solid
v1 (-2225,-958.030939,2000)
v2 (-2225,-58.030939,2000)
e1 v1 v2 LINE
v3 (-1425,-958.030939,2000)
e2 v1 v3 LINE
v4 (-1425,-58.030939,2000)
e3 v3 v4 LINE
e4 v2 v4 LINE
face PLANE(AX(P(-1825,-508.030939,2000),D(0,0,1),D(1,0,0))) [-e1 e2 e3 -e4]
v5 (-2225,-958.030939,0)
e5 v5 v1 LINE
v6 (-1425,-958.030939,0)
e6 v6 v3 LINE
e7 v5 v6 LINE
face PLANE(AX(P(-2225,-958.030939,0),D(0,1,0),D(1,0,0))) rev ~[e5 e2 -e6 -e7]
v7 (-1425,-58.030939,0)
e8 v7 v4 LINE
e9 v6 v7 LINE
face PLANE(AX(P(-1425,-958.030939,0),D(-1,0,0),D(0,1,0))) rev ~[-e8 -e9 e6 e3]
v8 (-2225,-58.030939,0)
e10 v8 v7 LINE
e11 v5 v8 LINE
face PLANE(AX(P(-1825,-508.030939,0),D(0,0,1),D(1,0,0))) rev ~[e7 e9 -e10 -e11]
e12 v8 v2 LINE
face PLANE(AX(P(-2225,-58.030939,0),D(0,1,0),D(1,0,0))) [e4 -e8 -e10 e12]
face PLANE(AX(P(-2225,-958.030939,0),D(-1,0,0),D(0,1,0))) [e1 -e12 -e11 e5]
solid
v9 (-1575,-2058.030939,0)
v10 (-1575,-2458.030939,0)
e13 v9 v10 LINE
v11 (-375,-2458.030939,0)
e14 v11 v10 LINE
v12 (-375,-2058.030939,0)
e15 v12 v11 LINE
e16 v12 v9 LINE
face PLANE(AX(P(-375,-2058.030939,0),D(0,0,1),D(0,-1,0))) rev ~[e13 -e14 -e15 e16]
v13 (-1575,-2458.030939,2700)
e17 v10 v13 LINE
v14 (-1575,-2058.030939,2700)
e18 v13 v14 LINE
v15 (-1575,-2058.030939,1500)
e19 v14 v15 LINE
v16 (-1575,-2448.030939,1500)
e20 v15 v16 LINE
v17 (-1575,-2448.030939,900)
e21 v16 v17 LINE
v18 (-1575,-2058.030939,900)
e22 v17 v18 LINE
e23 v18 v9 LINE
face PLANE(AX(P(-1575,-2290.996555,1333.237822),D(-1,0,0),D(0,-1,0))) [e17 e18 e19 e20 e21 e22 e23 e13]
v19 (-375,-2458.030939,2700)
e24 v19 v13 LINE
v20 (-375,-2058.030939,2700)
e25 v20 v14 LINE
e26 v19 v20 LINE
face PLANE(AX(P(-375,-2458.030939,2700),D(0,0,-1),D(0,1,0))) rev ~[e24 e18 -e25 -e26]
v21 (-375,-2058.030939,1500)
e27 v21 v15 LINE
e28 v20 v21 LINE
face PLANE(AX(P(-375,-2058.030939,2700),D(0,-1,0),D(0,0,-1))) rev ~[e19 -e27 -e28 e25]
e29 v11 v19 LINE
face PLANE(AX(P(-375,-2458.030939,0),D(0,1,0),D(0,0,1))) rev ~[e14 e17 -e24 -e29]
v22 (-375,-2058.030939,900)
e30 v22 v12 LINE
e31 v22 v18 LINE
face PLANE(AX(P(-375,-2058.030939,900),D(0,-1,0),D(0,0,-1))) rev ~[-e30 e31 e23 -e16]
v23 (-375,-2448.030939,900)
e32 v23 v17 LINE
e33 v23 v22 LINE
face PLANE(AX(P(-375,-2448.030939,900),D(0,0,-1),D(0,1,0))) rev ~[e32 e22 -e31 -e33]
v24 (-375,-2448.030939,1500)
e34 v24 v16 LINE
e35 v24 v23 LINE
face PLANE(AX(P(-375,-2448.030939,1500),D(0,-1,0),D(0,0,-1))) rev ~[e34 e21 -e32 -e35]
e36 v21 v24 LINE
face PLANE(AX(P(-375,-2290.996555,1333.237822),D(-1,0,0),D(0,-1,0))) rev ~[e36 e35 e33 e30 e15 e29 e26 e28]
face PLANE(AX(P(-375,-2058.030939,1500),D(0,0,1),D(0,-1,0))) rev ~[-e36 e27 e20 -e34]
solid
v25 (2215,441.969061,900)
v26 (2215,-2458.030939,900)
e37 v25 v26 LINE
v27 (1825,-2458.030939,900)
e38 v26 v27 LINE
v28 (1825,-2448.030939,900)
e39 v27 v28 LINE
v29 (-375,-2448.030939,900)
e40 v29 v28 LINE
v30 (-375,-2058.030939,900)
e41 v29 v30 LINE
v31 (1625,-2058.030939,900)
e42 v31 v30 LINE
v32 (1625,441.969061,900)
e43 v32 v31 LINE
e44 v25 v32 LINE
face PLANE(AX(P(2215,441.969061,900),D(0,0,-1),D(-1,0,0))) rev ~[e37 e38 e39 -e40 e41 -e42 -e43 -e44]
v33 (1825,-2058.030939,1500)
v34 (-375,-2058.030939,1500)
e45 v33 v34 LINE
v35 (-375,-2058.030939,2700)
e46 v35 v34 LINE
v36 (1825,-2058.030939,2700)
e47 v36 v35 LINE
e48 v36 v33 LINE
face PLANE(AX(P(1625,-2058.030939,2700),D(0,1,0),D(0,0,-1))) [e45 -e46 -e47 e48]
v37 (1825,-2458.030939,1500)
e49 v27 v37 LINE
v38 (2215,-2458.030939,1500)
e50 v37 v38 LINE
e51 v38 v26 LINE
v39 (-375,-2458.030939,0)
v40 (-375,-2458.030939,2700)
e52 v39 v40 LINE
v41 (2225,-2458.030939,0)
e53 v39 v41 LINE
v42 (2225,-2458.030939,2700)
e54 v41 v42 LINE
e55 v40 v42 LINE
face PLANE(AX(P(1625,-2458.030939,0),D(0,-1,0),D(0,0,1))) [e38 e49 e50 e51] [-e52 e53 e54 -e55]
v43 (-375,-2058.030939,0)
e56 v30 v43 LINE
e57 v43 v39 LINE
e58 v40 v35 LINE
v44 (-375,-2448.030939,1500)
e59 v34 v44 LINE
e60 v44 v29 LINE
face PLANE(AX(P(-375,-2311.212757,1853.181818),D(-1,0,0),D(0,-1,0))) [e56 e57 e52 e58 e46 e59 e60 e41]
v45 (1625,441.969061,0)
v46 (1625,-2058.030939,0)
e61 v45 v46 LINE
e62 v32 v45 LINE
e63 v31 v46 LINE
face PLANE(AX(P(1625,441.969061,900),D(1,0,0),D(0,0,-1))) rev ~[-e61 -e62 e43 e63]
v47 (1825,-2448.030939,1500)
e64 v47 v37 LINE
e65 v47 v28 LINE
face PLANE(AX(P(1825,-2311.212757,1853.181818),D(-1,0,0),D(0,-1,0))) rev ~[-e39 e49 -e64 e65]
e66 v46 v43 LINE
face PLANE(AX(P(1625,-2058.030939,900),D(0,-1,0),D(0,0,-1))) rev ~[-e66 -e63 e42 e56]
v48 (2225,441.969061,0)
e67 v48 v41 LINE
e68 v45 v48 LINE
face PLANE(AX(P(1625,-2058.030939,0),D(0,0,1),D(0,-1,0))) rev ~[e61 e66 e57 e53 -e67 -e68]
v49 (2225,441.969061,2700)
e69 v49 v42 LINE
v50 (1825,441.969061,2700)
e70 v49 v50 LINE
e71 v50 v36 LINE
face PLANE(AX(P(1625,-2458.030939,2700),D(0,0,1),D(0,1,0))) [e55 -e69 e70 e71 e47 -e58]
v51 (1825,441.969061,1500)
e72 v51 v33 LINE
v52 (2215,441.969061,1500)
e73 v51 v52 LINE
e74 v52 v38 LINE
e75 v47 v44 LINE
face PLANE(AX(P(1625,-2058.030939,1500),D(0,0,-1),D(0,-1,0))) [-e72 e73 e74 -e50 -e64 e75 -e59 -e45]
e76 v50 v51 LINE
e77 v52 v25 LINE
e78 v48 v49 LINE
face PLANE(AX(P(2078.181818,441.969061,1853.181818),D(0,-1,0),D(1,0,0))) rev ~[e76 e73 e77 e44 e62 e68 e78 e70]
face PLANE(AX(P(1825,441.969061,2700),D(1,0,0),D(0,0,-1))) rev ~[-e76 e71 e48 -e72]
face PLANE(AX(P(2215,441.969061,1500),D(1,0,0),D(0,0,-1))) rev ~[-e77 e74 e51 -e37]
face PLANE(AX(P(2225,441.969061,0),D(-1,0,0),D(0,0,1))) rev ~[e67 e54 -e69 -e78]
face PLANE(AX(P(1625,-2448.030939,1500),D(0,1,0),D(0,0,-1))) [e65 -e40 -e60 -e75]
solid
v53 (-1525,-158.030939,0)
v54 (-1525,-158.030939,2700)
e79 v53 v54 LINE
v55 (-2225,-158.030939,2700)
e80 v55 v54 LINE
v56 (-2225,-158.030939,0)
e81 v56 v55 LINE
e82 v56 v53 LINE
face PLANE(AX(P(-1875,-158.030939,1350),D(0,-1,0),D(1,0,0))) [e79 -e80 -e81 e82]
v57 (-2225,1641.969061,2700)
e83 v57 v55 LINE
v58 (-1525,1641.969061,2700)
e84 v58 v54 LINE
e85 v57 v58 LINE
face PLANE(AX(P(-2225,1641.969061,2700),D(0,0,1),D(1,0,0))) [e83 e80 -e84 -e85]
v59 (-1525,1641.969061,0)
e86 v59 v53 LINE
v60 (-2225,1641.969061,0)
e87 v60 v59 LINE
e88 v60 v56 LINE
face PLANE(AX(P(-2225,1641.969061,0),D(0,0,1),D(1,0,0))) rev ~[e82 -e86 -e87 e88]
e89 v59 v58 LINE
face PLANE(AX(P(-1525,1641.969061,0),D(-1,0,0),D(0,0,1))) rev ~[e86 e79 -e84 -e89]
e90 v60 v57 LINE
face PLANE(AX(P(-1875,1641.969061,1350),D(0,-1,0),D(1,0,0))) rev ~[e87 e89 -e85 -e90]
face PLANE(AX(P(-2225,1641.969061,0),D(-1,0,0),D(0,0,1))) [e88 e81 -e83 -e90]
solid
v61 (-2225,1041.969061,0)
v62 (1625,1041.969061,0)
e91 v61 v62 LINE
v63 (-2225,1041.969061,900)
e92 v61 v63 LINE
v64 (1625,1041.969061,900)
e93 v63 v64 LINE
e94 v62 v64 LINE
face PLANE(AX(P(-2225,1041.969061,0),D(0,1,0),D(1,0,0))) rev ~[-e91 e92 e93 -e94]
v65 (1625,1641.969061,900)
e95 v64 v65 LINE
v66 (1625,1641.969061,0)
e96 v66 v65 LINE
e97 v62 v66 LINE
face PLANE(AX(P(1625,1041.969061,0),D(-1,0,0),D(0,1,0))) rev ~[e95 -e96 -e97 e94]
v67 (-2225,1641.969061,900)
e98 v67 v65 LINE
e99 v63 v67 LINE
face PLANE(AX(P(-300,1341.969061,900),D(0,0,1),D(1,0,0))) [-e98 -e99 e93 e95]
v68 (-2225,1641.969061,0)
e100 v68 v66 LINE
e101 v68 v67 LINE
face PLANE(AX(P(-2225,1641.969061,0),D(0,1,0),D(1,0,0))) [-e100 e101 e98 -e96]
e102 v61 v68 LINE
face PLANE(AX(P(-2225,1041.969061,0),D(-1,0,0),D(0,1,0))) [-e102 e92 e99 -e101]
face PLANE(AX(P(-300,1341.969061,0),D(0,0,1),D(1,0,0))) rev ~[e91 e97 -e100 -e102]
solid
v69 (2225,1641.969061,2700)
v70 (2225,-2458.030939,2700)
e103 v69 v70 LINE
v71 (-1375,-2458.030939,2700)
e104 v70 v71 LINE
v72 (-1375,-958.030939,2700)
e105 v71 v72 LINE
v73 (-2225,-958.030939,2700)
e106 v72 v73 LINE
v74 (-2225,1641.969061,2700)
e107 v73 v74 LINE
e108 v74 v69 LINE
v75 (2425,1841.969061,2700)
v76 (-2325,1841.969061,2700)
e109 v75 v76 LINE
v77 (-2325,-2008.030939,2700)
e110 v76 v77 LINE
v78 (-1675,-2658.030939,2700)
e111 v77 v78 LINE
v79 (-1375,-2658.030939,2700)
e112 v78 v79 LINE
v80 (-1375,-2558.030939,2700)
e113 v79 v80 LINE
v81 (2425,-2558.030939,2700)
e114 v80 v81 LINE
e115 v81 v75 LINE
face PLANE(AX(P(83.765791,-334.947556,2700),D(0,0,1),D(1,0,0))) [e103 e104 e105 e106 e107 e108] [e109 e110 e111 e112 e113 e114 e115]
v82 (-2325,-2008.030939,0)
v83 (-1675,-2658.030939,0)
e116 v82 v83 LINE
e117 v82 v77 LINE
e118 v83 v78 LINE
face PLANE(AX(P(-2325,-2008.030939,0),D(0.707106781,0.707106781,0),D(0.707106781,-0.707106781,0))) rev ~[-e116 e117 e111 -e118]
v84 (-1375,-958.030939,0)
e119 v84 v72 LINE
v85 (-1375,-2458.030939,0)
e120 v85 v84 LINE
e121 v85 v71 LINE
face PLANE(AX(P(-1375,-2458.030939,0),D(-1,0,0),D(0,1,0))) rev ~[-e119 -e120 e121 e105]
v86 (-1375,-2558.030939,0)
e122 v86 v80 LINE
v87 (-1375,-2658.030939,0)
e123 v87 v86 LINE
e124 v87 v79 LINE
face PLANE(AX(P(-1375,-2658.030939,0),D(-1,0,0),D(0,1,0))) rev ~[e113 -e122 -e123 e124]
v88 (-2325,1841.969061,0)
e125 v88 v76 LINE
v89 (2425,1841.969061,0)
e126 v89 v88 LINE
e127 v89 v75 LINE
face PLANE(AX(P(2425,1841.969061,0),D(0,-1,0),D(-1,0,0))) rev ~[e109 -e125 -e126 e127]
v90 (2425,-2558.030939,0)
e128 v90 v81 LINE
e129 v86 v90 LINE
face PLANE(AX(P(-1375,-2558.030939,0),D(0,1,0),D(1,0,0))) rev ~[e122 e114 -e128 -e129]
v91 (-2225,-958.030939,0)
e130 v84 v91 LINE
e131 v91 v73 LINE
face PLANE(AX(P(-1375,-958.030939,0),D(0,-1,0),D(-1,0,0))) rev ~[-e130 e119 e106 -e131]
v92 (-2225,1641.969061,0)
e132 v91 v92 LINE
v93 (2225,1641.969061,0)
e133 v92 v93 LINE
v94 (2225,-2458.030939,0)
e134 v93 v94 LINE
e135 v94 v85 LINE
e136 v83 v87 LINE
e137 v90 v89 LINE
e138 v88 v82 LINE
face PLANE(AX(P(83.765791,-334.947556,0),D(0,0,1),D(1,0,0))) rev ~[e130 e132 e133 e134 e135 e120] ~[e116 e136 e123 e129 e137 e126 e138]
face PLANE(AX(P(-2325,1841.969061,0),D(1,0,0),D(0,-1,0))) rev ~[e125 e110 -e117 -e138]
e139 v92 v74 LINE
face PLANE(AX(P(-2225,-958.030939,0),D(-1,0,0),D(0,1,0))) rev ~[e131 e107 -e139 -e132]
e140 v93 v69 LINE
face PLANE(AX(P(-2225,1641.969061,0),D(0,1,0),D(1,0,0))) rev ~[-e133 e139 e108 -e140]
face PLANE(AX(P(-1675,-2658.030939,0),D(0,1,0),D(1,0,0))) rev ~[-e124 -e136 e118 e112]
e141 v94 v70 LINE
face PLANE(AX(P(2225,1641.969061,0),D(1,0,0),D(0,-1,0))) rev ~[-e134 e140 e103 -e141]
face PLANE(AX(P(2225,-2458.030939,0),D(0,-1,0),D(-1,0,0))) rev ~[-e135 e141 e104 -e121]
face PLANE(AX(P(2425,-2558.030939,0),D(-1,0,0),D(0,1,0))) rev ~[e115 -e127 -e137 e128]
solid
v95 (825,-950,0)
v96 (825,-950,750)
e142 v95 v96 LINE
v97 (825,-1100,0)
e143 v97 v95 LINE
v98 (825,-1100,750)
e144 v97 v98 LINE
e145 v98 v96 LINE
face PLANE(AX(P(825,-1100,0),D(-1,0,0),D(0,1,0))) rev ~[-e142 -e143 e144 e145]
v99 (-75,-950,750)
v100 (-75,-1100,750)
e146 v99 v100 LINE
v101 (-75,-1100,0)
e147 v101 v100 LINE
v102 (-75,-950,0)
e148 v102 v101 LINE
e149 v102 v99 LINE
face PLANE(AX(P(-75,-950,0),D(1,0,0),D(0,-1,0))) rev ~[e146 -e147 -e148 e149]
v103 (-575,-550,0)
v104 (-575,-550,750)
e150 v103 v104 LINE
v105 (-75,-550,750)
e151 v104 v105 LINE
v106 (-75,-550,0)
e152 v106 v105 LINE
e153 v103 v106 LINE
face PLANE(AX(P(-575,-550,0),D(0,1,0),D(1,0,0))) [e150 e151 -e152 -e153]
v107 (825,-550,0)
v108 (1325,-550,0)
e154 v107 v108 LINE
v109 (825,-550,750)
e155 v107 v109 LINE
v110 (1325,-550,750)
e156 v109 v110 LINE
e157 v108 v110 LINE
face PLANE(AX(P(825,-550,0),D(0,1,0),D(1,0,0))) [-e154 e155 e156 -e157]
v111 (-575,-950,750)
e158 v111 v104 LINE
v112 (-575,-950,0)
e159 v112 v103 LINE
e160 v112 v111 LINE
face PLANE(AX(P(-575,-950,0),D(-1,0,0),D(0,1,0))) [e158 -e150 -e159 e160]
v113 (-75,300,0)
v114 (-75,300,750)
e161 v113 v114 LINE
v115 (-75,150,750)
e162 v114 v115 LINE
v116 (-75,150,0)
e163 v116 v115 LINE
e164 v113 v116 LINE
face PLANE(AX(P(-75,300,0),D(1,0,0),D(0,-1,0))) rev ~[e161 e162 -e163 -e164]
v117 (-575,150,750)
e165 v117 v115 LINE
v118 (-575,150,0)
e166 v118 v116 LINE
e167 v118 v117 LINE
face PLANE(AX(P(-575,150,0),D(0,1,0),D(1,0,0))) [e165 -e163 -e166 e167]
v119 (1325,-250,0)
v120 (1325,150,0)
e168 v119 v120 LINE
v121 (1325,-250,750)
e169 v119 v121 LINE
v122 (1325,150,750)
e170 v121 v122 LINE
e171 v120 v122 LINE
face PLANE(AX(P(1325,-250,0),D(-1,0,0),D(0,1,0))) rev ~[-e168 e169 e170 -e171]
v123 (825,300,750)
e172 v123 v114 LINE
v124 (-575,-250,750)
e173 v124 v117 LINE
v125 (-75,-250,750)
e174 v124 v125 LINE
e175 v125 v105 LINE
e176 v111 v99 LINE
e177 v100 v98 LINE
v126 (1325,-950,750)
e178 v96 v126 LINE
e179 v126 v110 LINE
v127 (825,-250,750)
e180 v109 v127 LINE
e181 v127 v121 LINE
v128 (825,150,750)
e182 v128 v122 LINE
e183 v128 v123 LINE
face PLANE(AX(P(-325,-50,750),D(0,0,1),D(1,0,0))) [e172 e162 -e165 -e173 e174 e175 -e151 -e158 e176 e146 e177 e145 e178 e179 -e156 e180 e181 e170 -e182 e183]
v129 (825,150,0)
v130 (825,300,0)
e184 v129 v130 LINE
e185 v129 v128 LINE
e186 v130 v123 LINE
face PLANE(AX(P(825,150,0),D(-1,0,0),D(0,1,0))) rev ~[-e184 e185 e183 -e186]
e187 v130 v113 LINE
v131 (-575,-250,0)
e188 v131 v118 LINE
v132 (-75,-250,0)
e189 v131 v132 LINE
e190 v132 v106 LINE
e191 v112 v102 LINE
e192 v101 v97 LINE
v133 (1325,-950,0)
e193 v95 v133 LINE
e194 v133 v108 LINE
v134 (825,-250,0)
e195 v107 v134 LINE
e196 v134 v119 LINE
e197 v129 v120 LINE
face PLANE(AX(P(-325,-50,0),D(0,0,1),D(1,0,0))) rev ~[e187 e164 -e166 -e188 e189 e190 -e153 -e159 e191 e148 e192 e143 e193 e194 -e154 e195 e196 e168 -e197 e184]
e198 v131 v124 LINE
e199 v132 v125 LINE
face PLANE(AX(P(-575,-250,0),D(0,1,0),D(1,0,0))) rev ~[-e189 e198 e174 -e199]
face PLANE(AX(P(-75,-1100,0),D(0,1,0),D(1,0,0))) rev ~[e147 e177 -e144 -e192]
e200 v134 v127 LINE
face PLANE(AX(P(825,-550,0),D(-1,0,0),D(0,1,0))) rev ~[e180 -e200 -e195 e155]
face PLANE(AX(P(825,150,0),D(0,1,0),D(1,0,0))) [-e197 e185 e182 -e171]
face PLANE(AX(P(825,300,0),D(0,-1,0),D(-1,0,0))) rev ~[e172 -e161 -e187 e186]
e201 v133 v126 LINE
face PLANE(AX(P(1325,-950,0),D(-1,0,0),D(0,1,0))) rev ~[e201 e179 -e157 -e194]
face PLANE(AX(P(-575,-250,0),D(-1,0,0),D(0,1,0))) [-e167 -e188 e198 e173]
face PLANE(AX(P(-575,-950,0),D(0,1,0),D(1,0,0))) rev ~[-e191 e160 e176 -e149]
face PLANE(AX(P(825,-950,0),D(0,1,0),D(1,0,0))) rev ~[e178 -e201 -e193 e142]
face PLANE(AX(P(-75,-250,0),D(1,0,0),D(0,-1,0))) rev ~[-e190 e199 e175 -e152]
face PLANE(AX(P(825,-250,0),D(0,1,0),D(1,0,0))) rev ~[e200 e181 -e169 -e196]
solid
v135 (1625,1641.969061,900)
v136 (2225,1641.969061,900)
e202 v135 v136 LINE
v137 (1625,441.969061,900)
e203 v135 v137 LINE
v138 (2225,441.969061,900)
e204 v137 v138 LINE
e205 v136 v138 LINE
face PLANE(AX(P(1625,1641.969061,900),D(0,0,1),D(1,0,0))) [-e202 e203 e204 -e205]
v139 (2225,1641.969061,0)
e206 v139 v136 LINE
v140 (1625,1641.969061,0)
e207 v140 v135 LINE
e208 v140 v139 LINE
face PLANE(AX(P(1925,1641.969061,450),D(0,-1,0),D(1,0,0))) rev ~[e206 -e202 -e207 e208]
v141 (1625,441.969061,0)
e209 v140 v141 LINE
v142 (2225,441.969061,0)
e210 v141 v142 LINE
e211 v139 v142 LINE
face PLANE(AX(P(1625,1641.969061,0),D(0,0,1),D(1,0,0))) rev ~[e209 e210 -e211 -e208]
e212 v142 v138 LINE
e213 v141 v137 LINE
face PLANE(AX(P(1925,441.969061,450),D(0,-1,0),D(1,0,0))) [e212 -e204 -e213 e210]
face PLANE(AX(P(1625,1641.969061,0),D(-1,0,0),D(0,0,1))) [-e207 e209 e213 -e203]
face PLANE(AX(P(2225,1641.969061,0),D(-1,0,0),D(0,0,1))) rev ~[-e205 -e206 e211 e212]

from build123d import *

# Parameters (mm, degrees)
F1_DEPTH       = 2700
F2_W           = 700
F2_H           = 2700
F3_DEPTH       = 1800
F4_W           = 500
F4_H           = 400
F5_DEPTH       = 750
F6_W           = 600
F6_H           = 900
F7_DEPTH       = 1200
F9_DEPTH       = 2900
F11_DEPTH      = 2000
F11_DEPTH_BACK = 200
F13_DEPTH      = 1200
F14_W          = 3850
F14_H          = 600
F15_DEPTH      = 900
F14_W_2        = 800
F14_H_2        = 900
F16_DEPTH      = 2000


with BuildPart() as f1:
    # F0 (on Top) → F1 (new body)
    with BuildSketch(Plane.XY):
        Polygon((-1375, -2658.0309391022), (-1375, -2558.0309391022), (2425, -2558.0309391022), (2425, 1841.9690608978), (-2325, 1841.9690608978), (-2325, -2008.0309391022), (-1675, -2658.0309391022), align=None)
        Polygon((-2225, -958.0309391022), (-2225, 1641.9690608978), (2225, 1641.9690608978), (2225, -2458.0309391022), (-1375, -2458.0309391022), (-1375, -958.0309391022), align=None, mode=Mode.SUBTRACT)
    extrude(amount=F1_DEPTH)


with BuildPart() as f3:
    # F2 (on face) → F3 (new body)
    with BuildSketch(Plane.XZ.offset(-1641.9690608978)):
        with Locations((-1875, 1350)):
            Rectangle(F2_W, F2_H)
    extrude(amount=F3_DEPTH)


with BuildPart() as f5:
    # F4 (on Top) → F5 (new body)
    with BuildSketch(Plane.XY):
        with Locations((-325, -50)):
            Rectangle(F4_W, F4_H)
        Polygon((825, 300), (-75, 300), (-75, 150), (-75, -250), (-75, -400), (825, -400), (825, -250), (825, 150), align=None)
        with Locations((1075, -50)):
            Rectangle(F4_W, F4_H)
        Polygon((825, -400), (-75, -400), (-75, -550), (-75, -950), (-75, -1100), (825, -1100), (825, -950), (825, -550), align=None)
        with Locations((-325, -750)):
            Rectangle(F4_W, F4_H)
        with Locations((1075, -750)):
            Rectangle(F4_W, F4_H)
    extrude(amount=F5_DEPTH)


with BuildPart() as f7:
    # F6 (on face) → F7 (new body)
    with BuildSketch(Plane.XZ.offset(-1641.9690608978)):
        with Locations((1925, 450)):
            Rectangle(F6_W, F6_H)
    extrude(amount=F7_DEPTH)


with BuildPart() as f9:
    # F8 (on face) → F9 (new body, through all)
    with BuildSketch(Plane.XZ.offset(-441.9690608978)):
        Polygon((2215, 900), (2225, 900), (2225, 2700), (1825, 2700), (1825, 1500), (2215, 1500), align=None)
        Polygon((1625, 0), (2225, 0), (2225, 900), (2215, 900), (1625, 900), align=None)
    extrude(amount=F9_DEPTH)

    # F10 (on face) → F11 (join, two sides)
    with BuildSketch(Plane(origin=(1625, 0, 0), x_dir=(0, -1, 0), z_dir=(-1, 0, 0))) as f11_sk:
        Polygon((2448.0309391022, 900), (2458.0309391022, 900), (2458.0309391022, 2700), (2058.0309391022, 2700), (2058.0309391022, 1500), (2448.0309391022, 1500), align=None)
        Polygon((2058.0309391022, 0), (2458.0309391022, 0), (2458.0309391022, 900), (2448.0309391022, 900), (2058.0309391022, 900), align=None)
    extrude(amount=F11_DEPTH)
    extrude(f11_sk.sketch, amount=-F11_DEPTH_BACK)


with BuildPart() as f13:
    # F12 (on face) → F13 (new body)
    with BuildSketch(Plane(origin=(-375, 0, 0), x_dir=(0, -1, 0), z_dir=(-1, 0, 0))):
        Polygon((2458.0309391022, 0), (2458.0309391022, 2700), (2058.0309391022, 2700), (2058.0309391022, 1500), (2448.0309391022, 1500), (2448.0309391022, 900), (2058.0309391022, 900), (2058.0309391022, 0), align=None)
    extrude(amount=F13_DEPTH)


with BuildPart() as f15:
    # F14 (on Top) → F15 (new body)
    with BuildSketch(Plane.XY):
        with Locations((-300, 1341.9690608978)):
            Rectangle(F14_W, F14_H)
    extrude(amount=F15_DEPTH)


with BuildPart() as f16:
    # F14 (on Top) → F16 (new body)
    with BuildSketch(Plane.XY):
        with Locations((-1825, -508.0309391022)):
            Rectangle(F14_W_2, F14_H_2)
    extrude(amount=F16_DEPTH)


solid = Compound([f1.part, f3.part, f5.part, f7.part, f9.part, f13.part, f15.part, f16.part])
